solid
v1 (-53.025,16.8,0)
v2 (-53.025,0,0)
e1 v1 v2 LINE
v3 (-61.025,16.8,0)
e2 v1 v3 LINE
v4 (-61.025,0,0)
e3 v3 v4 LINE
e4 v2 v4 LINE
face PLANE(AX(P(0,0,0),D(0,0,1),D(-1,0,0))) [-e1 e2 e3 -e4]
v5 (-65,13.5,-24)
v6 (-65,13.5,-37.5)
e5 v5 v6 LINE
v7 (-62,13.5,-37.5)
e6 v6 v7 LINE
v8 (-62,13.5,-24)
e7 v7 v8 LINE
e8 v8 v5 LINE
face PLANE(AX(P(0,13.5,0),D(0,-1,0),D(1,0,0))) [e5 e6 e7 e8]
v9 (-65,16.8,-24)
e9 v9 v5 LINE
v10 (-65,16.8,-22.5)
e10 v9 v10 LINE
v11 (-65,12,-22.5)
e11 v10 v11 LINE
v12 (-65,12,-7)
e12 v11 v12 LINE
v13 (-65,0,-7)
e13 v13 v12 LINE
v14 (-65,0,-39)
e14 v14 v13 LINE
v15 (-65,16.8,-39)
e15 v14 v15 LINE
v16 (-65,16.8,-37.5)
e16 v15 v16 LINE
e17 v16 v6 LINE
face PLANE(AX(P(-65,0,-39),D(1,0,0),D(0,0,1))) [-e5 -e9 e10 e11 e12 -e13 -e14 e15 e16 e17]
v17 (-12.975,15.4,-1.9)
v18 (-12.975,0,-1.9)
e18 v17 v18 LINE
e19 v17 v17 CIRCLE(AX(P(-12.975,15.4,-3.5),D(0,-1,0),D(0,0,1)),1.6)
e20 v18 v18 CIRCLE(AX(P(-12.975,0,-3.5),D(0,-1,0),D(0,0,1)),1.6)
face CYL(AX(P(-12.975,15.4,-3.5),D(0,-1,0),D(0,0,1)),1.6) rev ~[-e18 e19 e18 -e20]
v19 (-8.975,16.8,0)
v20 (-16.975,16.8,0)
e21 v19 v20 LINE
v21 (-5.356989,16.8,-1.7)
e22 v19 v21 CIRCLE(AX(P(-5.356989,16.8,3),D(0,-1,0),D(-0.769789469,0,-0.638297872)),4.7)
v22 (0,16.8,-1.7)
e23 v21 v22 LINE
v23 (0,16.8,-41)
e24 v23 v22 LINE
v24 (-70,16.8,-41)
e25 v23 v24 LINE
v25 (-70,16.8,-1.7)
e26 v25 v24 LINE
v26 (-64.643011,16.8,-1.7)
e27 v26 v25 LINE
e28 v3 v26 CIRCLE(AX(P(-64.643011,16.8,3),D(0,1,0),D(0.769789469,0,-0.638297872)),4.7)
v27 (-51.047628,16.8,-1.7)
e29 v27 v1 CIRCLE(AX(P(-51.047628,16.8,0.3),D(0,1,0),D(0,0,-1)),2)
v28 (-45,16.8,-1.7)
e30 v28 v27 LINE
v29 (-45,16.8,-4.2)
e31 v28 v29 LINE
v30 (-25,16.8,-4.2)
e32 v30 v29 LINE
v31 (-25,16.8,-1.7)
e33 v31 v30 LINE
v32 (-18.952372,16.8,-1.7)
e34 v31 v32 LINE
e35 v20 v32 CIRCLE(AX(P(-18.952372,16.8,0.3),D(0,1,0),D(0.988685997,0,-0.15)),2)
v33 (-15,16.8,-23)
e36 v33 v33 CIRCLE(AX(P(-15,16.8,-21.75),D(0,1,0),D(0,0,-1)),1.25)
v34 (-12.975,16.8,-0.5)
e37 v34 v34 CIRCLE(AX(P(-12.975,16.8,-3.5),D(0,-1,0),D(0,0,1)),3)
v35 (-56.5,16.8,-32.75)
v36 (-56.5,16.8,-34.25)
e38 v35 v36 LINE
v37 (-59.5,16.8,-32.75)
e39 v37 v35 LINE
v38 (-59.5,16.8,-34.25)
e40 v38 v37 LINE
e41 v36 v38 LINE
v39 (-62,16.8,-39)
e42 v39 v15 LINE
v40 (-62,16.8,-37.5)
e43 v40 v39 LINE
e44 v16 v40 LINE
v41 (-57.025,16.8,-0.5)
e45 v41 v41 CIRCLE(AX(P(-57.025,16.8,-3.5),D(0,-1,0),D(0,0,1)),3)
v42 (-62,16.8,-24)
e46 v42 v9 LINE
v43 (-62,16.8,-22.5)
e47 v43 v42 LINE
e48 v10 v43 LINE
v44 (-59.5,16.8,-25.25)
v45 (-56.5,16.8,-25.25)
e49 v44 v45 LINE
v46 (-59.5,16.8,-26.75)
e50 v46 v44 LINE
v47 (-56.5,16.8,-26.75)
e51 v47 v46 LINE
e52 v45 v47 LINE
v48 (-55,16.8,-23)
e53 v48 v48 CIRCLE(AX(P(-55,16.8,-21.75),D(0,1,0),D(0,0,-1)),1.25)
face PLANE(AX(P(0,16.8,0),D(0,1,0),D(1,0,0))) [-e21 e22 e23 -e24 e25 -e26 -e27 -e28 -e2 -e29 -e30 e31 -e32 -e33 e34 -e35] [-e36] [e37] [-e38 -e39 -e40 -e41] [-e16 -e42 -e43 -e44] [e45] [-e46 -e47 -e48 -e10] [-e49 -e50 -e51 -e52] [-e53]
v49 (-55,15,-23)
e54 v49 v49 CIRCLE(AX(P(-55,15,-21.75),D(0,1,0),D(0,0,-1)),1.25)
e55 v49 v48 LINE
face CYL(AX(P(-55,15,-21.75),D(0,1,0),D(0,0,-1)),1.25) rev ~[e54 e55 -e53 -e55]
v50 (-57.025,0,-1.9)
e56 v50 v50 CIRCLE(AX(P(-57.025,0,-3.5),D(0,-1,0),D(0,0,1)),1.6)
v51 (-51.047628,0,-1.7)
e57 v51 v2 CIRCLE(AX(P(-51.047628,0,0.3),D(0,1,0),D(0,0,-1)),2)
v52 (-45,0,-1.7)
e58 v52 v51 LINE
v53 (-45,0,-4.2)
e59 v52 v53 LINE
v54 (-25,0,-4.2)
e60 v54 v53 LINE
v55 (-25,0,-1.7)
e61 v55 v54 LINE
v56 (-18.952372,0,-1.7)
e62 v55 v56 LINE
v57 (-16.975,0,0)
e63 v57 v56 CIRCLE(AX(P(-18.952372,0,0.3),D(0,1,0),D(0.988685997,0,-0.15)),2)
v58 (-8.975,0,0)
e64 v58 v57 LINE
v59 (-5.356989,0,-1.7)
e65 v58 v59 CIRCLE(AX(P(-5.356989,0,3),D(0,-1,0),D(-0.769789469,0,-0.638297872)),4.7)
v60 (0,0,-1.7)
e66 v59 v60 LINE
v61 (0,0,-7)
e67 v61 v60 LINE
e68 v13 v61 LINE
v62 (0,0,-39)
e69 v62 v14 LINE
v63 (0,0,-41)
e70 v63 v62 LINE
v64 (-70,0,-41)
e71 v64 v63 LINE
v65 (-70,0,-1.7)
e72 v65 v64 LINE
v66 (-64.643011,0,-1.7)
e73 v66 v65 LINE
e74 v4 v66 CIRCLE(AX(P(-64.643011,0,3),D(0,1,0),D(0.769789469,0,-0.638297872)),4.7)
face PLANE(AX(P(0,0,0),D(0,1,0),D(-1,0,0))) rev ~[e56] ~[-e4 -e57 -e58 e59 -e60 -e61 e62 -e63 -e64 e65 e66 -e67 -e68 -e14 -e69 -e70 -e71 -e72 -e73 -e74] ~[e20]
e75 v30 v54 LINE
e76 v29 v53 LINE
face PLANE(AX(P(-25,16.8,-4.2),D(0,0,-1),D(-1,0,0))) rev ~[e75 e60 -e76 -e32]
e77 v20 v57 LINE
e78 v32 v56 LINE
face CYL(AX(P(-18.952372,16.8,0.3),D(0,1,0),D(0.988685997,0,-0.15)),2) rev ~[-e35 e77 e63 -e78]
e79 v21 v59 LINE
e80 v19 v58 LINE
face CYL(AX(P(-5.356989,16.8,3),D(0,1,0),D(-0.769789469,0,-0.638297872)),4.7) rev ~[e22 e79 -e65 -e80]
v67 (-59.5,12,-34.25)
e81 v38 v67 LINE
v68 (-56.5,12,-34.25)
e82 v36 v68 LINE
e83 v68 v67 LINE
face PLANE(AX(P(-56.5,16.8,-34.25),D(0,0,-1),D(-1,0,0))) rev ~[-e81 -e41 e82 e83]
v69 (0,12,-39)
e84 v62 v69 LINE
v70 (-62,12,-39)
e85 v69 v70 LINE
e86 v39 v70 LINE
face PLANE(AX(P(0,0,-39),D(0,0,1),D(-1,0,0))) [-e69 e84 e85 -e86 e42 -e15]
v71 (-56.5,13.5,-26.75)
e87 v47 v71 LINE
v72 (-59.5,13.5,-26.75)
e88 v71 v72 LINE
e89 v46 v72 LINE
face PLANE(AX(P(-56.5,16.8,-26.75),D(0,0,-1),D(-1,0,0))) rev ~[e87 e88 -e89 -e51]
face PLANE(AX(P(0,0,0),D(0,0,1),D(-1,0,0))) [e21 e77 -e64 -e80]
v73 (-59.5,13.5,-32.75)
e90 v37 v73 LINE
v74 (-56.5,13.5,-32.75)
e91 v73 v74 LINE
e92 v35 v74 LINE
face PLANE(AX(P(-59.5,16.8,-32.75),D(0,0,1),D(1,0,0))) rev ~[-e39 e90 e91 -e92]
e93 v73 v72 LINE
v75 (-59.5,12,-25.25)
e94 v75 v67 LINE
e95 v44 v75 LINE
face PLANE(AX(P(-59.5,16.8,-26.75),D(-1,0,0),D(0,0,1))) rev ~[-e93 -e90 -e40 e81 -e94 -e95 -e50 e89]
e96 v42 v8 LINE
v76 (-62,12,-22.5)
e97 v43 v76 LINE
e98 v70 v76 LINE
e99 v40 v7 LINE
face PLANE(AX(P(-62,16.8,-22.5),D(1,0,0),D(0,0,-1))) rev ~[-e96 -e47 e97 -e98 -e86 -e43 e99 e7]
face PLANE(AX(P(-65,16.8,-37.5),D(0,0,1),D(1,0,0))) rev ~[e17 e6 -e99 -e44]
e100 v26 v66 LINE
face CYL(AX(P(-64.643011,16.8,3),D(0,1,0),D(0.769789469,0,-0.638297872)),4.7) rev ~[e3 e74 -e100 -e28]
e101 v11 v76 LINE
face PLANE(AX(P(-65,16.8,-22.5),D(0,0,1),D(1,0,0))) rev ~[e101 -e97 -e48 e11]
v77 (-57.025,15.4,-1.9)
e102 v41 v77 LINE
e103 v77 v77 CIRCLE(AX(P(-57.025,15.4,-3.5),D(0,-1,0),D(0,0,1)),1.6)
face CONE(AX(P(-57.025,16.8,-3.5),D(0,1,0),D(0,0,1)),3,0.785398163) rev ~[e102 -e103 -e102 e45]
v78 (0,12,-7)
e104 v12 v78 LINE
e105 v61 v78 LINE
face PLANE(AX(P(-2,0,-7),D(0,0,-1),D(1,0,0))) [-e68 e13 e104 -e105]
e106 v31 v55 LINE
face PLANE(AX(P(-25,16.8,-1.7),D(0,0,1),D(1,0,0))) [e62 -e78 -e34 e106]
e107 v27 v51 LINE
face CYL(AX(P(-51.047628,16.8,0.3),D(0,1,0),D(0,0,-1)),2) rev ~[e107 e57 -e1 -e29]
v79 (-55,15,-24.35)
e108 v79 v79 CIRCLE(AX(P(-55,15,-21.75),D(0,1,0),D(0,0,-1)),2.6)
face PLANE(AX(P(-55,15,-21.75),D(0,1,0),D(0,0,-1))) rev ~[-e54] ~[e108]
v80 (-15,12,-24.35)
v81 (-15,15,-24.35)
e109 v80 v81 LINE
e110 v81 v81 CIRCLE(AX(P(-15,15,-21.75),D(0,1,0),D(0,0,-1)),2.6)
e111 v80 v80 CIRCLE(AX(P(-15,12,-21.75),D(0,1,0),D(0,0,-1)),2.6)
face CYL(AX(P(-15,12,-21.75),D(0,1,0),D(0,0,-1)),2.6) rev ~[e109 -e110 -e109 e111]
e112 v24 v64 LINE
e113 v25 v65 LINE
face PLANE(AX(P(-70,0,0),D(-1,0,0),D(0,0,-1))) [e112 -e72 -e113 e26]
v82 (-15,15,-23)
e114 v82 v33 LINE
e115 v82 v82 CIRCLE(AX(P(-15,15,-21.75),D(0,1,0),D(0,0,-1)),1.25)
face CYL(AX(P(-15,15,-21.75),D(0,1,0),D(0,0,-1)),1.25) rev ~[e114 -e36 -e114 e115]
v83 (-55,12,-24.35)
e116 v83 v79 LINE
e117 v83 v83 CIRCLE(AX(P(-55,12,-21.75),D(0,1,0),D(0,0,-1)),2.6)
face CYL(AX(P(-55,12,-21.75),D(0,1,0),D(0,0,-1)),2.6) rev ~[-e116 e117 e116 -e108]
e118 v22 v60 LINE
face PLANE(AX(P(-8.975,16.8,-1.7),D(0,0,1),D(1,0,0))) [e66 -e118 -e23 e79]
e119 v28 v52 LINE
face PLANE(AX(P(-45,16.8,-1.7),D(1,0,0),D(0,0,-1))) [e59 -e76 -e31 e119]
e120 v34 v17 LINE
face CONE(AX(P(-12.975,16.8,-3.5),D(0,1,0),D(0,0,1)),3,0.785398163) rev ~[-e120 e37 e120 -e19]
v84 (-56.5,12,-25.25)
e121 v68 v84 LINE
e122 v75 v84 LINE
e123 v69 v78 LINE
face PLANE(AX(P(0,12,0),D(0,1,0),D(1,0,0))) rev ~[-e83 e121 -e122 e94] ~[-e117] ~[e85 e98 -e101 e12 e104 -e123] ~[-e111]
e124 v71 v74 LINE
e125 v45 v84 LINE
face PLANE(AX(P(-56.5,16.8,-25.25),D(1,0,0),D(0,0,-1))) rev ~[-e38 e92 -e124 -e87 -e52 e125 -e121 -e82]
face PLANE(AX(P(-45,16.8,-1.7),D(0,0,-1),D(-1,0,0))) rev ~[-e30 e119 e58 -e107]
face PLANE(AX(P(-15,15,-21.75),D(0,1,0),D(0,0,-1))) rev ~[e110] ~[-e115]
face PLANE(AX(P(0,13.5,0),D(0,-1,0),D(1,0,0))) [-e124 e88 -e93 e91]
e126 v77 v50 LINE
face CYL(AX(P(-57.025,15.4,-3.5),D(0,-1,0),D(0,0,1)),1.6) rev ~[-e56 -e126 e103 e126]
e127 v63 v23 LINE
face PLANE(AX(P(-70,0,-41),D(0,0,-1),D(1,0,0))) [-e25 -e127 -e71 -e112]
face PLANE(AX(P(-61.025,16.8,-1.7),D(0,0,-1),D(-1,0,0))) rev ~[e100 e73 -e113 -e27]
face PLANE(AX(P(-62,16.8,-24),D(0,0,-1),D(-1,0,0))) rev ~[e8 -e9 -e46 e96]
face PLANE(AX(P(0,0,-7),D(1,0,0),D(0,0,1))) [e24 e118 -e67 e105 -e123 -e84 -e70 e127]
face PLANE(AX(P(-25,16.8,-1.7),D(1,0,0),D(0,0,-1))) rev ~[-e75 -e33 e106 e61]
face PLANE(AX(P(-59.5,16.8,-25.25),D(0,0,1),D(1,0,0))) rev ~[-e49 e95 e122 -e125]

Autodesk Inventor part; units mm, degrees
ref_plane "YZ Plane" through (0, 0, 0) normal (1, 0, 0) x (0, 1, 0)
ref_plane "XZ Plane" through (0, 0, 0) normal (0, 1, 0) x (-1, 0, 0)
ref_plane "XY Plane" through (0, 0, 0) normal (0, 0, 1) x (1, 0, 0)
sketch "Эскиз1" plane through (0, 0, 0) normal (0, 1, 0) x (-1, 0, 0)
  line L0 (0, 0) -> (70, 0)
  line L1 (70, 0) -> (70, -41)
  line L2 (70, -41) -> (0, -41)
  line L3 (0, -41) -> (0, 0)
  line L4 (65, -7) -> (0, -7)
  line L5 (0, -7) -> (0, -39)
  line L6 (0, -39) -> (65, -39)
  line L7 (65, -39) -> (65, -7)
  line L8 (65, -7) -> (0, -39) construction
  line L9 (0, -7) -> (65, -39) construction
  line L10 (0, -7) -> (2, -7)
  point P0 (0, -7)
  dimension "d0" = 70
  dimension "d224" = 7
  dimension "d225" = 5
  dimension "d226" = 32
  dimension "d302" = 2
extrude "Выдавливание1" add sketch "Эскиз1" along normal blind 12 contours L0 L1 L2 L3 L6 L7 L4
sketch "Эскиз40" plane through (0, 12, 0) normal (0, 1, 0) x (1, 0, 0)
  line L0 (0, 41) -> (-70, 41) projected
  line L1 (0, 0) -> (-70, 0)
  line L2 (-70, 0) -> (-70, 41)
  line L3 (-70, 41) -> (0, 41)
  line L4 (0, 41) -> (0, 0)
  point P0 (0, 41)
extrude "Выдавливание32" add sketch "Эскиз40" along normal blind 4.8
sketch "Эскиз39" plane through (0, 16.8, 0) normal (0, 1, 0) x (1, 0, 0)
  line L0 (-70, 41) -> (-70, 0) projected
  line L1 (0, 41) -> (-70, 41) projected
  line L2 (0, 39) -> (0, 41) projected
  line L3 (-65, 39) -> (0, 39) projected
  line L4 (-65, 7) -> (-65, 39) projected
  line L5 (0, 7) -> (-65, 7) projected
  line L6 (0, 0) -> (0, 7) projected
  line L7 (-70, 0) -> (0, 0) projected
  line L8 (-70, 0) -> (0, 0) construction
  line L9 (-35, 0) -> (-35, 7) construction
  line L10 (-57.025, 3.5) -> (-12.975, 3.5) construction
  point P0 (-35, 3.5)
  dimension "d356" = 44.05
hole "Отверстие6" at (-12.975, 16.8, -3.5) at (-57.025, 16.8, -3.5) direction (0, -1, 0) diameter 3.2 end through all countersink diameter 6 countersink angle 90
sketch "Эскиз49" plane through (0, 12, 0) normal (0, 1, 0) x (1, 0, 0)
  line L0 (-70, 0) -> (0, 0) construction
  line L1 (-35, 0) -> (-35, 21.75) construction
  line L2 (-55, 21.75) -> (-15, 21.75) construction
  dimension "d369" = 21.75
  dimension "d370" = 40
hole "Отверстие8" at (-15, 12, -21.75) at (-55, 12, -21.75) direction (0, 1, 0) diameter 2.5 end through all counterbore diameter 5.2 counterbore depth 3
sketch "Эскиз48" plane through (0, 16.8, 0) normal (0, 1, 0) x (1, 0, 0)
  line L0 (-53.025, 0) -> (-16.975, 0)
  line L1 (-16.975, 0) -> (-16.975, 4.2)
  line L2 (-16.975, 4.2) -> (-53.025, 4.2)
  line L3 (-53.025, 4.2) -> (-53.025, 0)
  line L4 (-70, 0) -> (0, 0) projected
  line L5 (-70, 41) -> (-70, 0) projected
  line L6 (-70, 0) -> (-61.025, 0)
  line L7 (-61.025, 0) -> (-61.025, 1.7)
  line L8 (-61.025, 1.7) -> (-70, 1.7)
  line L9 (-70, 1.7) -> (-70, 0)
  line L10 (0, 0) -> (-8.975, 0)
  line L11 (-8.975, 0) -> (-8.975, 1.7)
  line L12 (-8.975, 1.7) -> (0, 1.7)
  line L13 (0, 1.7) -> (0, 0)
  line L14 (-61.025, 0) -> (-53.025, 0)
  line L15 (-53.025, 0) -> (-53.025, 7)
  line L16 (-53.025, 7) -> (-61.025, 7)
  line L17 (-61.025, 7) -> (-61.025, 0)
  circle A0 centre (-57.025, 3.5) radius 1.6 projected
  line L18 (-61.025, 0) -> (-53.025, 7) construction
  line L19 (-53.025, 0) -> (-61.025, 7) construction
  line L20 (-8.975, 0) -> (-16.975, 0)
  line L21 (-16.975, 0) -> (-16.975, 7)
  line L22 (-16.975, 7) -> (-8.975, 7)
  line L23 (-8.975, 7) -> (-8.975, 0)
  circle A1 centre (-12.975, 3.5) radius 3 projected
  line L24 (-8.975, 0) -> (-16.975, 7) construction
  line L25 (-16.975, 0) -> (-8.975, 7) construction
  line L26 (-53.025, 0) -> (-45, 0)
  line L27 (-45, 0) -> (-45, 1.7)
  line L28 (-45, 1.7) -> (-53.025, 1.7)
  line L29 (-53.025, 1.7) -> (-53.025, 0)
  line L30 (-16.975, 0) -> (-25, 0)
  line L31 (-25, 0) -> (-25, 1.7)
  line L32 (-25, 1.7) -> (-16.975, 1.7)
  line L33 (-16.975, 1.7) -> (-16.975, 0)
  line L34 (-45, 1.7) -> (-45, 4.2)
  line L35 (-25, 1.7) -> (-25, 4.2)
  point P0 (-35, 0)
  point P1 (-8.975, 0)
  point P2 (-53.025, 1.7)
  point P3 (-16.975, 1.7)
  dimension "d359" = 4.2
  dimension "d363" = 8
  dimension "d364" = 8
  dimension "d365" = 1.7
  dimension "d366" = 8.025
extrude "Выдавливание38" cut sketch "Эскиз48" against normal through all contours L3 L28 L27 L0 | L27 L34 L2 L35 L31 L0 | L4 L5 L8 L7 | L31 L32 L1 L0 | L11 L12 L13 L4
fillet "Сопряжение2" radius 2 2 edges at (-16.975, 8.4, -1.7) (-53.025, 8.4, -1.7)
fillet "Сопряжение2" radius 4.7 2 edges at (-8.975, 8.4, -1.7) (-61.025, 8.4, -1.7)
sketch "Эскиз50" plane through (0, 16.8, 0) normal (0, 1, 0) x (1, 0, 0)
  line L0 (-62, 22.5) -> (-62, 24)
  line L1 (-62, 24) -> (-65, 24)
  line L2 (-65, 24) -> (-65, 22.5)
  line L3 (-65, 22.5) -> (-62, 22.5)
  line L4 (-62, 37.5) -> (-62, 39)
  line L5 (-62, 39) -> (-65, 39)
  line L6 (-65, 39) -> (-65, 37.5)
  line L7 (-65, 37.5) -> (-62, 37.5)
  line L8 (-70, 41) -> (-70, 1.7) projected
  line L9 (0, 41) -> (-70, 41) projected
  line L10 (-63.5, 24) -> (-63.5, 37.5) construction
  line L11 (-63.5, 30.75) -> (-58, 30.75) construction
  line L12 (-58, 30.75) -> (-58, 26.75) construction
  line L13 (-59.5, 25.25) -> (-56.5, 25.25)
  line L14 (-56.5, 25.25) -> (-56.5, 26.75)
  line L15 (-56.5, 26.75) -> (-59.5, 26.75)
  line L16 (-59.5, 26.75) -> (-59.5, 25.25)
  line L17 (-59.5, 32.75) -> (-56.5, 32.75)
  line L18 (-56.5, 32.75) -> (-56.5, 34.25)
  line L19 (-56.5, 34.25) -> (-59.5, 34.25)
  line L20 (-59.5, 34.25) -> (-59.5, 32.75)
  point P0 (0, 0)
  dimension "d378" = 13.5
  dimension "d379" = 1.5
  dimension "d380" = 3
  dimension "d385" = 5
  dimension "d386" = 2
  dimension "d389" = 6
  dimension "d390" = 4
  dimension "d391" = 5.5
extrude "Выдавливание39" cut sketch "Эскиз50" against normal through all
sketch "Эскиз51" plane through (0, 12, 0) normal (0, -1, 0) x (1, 0, 0)
  line L0 (-62, -24) -> (-65, -24) projected
  line L1 (-65, -37.5) -> (-62, -37.5) projected
  line L2 (-62, -24) -> (-65, -24)
  line L3 (-65, -24) -> (-65, -37.5)
  line L4 (-65, -37.5) -> (-62, -37.5)
  line L5 (-62, -37.5) -> (-62, -24)
  line L6 (-56.5, -26.75) -> (-59.5, -26.75) projected
  line L7 (-59.5, -32.75) -> (-56.5, -32.75) projected
  line L8 (-59.5, -26.75) -> (-56.5, -26.75)
  line L9 (-56.5, -26.75) -> (-56.5, -32.75)
  line L10 (-56.5, -32.75) -> (-59.5, -32.75)
  line L11 (-59.5, -32.75) -> (-59.5, -26.75)
  point P0 (0, 0)
extrude "Выдавливание40" cut sketch "Эскиз51" against normal blind 1.5
properties part number "Стойка под электроннику"
